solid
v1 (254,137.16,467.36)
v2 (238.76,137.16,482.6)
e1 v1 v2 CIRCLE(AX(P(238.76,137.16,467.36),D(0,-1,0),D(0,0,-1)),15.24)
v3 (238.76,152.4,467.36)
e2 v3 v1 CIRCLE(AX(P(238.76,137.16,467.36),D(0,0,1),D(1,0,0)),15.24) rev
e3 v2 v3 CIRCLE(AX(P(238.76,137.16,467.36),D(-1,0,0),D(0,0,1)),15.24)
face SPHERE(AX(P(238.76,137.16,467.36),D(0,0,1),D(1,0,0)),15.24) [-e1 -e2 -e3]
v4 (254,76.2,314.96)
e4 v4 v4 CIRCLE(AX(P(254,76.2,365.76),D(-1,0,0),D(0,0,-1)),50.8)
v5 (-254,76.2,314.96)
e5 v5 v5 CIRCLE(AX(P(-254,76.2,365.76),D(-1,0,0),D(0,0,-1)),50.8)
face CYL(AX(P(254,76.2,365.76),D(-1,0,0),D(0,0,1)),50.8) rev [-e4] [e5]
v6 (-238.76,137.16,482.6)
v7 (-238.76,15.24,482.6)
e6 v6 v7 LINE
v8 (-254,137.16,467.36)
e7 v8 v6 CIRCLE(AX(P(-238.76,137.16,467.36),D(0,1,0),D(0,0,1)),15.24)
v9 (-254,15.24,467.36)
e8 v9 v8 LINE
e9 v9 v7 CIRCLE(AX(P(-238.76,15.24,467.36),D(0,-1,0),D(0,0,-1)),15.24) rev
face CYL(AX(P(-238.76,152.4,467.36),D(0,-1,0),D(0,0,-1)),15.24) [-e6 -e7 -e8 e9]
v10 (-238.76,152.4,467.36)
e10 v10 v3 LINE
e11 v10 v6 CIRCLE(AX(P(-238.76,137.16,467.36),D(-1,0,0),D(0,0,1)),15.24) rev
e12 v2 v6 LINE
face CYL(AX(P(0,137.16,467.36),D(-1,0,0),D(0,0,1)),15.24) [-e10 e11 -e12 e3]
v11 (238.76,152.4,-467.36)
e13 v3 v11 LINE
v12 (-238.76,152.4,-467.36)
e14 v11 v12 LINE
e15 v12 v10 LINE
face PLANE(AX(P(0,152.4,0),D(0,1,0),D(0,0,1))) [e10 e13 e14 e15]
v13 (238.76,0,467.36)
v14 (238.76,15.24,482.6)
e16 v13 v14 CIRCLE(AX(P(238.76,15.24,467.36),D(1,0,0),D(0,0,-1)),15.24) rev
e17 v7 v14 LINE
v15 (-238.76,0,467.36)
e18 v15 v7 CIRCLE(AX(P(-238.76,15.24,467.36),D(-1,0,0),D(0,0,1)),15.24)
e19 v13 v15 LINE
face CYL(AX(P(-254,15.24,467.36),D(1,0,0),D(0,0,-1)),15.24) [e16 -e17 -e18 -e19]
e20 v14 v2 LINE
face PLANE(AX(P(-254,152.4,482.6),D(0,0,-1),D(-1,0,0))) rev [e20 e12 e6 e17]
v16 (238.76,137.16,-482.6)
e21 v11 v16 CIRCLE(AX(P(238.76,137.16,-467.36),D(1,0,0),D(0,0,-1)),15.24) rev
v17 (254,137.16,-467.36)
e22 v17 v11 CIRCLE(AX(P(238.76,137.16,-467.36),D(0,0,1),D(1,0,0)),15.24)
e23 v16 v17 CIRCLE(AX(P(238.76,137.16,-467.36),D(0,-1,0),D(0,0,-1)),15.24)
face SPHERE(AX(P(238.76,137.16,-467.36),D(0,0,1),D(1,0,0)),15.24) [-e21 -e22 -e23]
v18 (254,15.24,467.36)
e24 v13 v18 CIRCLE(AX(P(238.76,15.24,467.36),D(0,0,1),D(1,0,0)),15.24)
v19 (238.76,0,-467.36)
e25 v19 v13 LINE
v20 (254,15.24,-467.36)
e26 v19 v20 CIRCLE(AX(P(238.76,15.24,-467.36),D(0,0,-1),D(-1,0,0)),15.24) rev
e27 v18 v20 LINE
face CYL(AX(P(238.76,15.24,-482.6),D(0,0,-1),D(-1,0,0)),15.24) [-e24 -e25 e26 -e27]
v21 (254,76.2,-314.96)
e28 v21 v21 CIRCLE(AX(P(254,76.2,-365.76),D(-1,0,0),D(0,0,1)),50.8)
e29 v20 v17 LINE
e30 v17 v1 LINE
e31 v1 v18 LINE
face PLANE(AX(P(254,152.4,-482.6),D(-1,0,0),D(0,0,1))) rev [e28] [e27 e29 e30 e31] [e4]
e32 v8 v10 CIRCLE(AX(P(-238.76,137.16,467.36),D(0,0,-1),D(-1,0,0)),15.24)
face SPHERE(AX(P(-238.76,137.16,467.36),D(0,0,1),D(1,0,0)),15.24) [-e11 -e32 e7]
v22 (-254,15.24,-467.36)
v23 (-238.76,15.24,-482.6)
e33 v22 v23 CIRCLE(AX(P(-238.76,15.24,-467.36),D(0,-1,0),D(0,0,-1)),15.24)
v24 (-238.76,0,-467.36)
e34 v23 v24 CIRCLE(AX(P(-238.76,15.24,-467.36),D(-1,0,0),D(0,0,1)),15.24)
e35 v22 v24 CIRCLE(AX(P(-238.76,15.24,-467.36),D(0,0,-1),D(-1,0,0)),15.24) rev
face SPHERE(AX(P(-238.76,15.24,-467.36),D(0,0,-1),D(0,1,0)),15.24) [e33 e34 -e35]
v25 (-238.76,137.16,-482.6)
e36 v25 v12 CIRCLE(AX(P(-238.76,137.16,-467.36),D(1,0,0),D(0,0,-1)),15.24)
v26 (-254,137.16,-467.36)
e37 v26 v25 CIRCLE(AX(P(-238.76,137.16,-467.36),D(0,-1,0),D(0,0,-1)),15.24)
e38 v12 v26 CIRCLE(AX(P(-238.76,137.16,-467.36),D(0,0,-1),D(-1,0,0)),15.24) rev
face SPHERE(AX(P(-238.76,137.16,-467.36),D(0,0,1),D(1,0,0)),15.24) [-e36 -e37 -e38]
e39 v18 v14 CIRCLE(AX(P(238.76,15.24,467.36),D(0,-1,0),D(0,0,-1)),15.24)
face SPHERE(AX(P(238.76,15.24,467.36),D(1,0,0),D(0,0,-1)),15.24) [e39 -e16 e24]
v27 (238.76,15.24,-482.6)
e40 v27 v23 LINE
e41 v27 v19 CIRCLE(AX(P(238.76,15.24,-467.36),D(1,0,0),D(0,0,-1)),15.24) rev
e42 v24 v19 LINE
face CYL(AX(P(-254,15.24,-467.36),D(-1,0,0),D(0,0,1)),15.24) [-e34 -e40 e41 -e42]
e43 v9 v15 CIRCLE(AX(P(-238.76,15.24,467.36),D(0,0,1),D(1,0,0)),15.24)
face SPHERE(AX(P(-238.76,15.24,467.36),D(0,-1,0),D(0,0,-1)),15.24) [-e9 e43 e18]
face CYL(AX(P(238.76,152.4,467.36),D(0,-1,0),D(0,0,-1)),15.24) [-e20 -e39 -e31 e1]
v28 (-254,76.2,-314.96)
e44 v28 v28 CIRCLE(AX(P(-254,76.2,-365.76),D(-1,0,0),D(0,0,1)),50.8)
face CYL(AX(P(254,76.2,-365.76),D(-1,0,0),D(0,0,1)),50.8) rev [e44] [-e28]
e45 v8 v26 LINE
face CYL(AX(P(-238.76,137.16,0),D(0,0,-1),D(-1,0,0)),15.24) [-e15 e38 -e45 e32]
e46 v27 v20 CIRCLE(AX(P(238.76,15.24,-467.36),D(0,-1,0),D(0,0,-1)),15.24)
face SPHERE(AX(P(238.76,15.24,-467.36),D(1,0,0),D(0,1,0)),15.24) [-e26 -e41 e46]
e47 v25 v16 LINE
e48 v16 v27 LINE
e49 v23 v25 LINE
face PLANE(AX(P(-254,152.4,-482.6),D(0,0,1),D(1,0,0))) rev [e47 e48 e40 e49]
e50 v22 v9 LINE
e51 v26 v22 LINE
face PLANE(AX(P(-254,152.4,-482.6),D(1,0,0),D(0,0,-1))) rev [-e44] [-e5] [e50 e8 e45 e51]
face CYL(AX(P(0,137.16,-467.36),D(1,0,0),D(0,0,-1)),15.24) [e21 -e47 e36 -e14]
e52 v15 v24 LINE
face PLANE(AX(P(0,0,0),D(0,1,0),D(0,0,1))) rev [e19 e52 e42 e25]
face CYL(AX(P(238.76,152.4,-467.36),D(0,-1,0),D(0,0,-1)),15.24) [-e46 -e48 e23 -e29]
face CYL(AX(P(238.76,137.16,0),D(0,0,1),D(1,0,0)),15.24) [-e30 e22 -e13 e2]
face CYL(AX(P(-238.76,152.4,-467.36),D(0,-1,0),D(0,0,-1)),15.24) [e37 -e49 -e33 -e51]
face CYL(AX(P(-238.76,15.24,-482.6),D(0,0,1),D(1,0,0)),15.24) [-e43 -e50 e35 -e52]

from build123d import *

# Parameters (mm, degrees)
SKETCH2_W           = 508
SKETCH2_H           = 965.2
BOSS_EXTRUDE1_DEPTH = 152.4
FILLET1_R           = 15.24
FILLET2_R           = 15.24
SKETCH5_R           = 50.8
CUT_EXTRUDE1_DEPTH  = 718.072186045


with BuildPart() as part:
    # Sketch2 → Boss-Extrude1 (new body)
    with BuildSketch(Plane(origin=(0, 0, 0), x_dir=(1, 0, 0), z_dir=(0, 1, 0))):
        Rectangle(SKETCH2_W, SKETCH2_H)
    extrude(amount=BOSS_EXTRUDE1_DEPTH)

    # Fillet1
    fillet1_edges = [part.edges().sort_by_distance(p)[0] for p in [
        (-254, 152.4, 0),
        (0, 152.4, 482.6),
        (254, 152.4, 0),
        (0, 152.4, -482.6),
    ]]
    fillet(fillet1_edges, radius=FILLET1_R)

    # Fillet2
    # the kernel refuses this fillet: 15.24 mm, written as the material it takes off along each edge
    with BuildSketch(Plane(origin=(238.76, 137.16, -467.36), x_dir=(1, 0, 0), z_dir=(0, 0, -1))) as fillet2_piece_1_section:
        Polygon((0, 0), (FILLET2_R, 0), (FILLET2_R, -FILLET2_R), (0, -FILLET2_R), align=None)
    fillet2_piece_1 = extrude(amount=FILLET2_R, mode=Mode.PRIVATE)
    fillet2_piece_1 = fillet2_piece_1 - Plane(origin=(238.76, 137.16, -467.36), x_dir=(-0.7071067811865475, -0.7071067811865475, 0), z_dir=(0, 0, -1)) * Sphere(FILLET2_R, mode=Mode.PRIVATE)
    add(fillet2_piece_1, mode=Mode.SUBTRACT)
    with BuildSketch(Plane(origin=(238.76, 137.16, 467.36), x_dir=(0, 0, 1), z_dir=(1, 0, 0))) as fillet2_piece_2_section:
        Polygon((0, 0), (FILLET2_R, 0), (FILLET2_R, -FILLET2_R), (0, -FILLET2_R), align=None)
    fillet2_piece_2 = extrude(amount=FILLET2_R, mode=Mode.PRIVATE)
    fillet2_piece_2 = fillet2_piece_2 - Plane(origin=(238.76, 137.16, 467.36), x_dir=(0, -0.7071067811865475, -0.7071067811865475), z_dir=(1, 0, 0)) * Sphere(FILLET2_R, mode=Mode.PRIVATE)
    add(fillet2_piece_2, mode=Mode.SUBTRACT)
    with BuildSketch(Plane(origin=(-238.76, 137.16, -467.36), x_dir=(-1, 0, 0), z_dir=(0, 0, -1))) as fillet2_piece_3_section:
        Polygon((0, 0), (FILLET2_R, 0), (FILLET2_R, FILLET2_R), (0, FILLET2_R), align=None)
    fillet2_piece_3 = extrude(amount=FILLET2_R, mode=Mode.PRIVATE)
    fillet2_piece_3 = fillet2_piece_3 - Plane(origin=(-238.76, 137.16, -467.36), x_dir=(0.7071067811865475, -0.7071067811865475, 0), z_dir=(0, 0, -1)) * Sphere(FILLET2_R, mode=Mode.PRIVATE)
    add(fillet2_piece_3, mode=Mode.SUBTRACT)
    with BuildSketch(Plane(origin=(-238.76, 137.16, 467.36), x_dir=(0, 0, 1), z_dir=(-1, 0, 0))) as fillet2_piece_4_section:
        Polygon((0, 0), (FILLET2_R, 0), (FILLET2_R, FILLET2_R), (0, FILLET2_R), align=None)
    fillet2_piece_4 = extrude(amount=FILLET2_R, mode=Mode.PRIVATE)
    fillet2_piece_4 = fillet2_piece_4 - Plane(origin=(-238.76, 137.16, 467.36), x_dir=(0, -0.7071067811865475, -0.7071067811865475), z_dir=(-1, 0, 0)) * Sphere(FILLET2_R, mode=Mode.PRIVATE)
    add(fillet2_piece_4, mode=Mode.SUBTRACT)
    with BuildSketch(Plane(origin=(-238.76, 15.24, 467.36), x_dir=(0, -1, 0), z_dir=(-1, 0, 0))) as fillet2_piece_5_section:
        Polygon((0, 0), (FILLET2_R, 0), (FILLET2_R, FILLET2_R), (0, FILLET2_R), align=None)
    fillet2_piece_5 = extrude(amount=FILLET2_R, mode=Mode.PRIVATE)
    fillet2_piece_5 = fillet2_piece_5 - Plane(origin=(-238.76, 15.24, 467.36), x_dir=(0, 0.7071067811865475, -0.7071067811865475), z_dir=(-1, 0, 0)) * Sphere(FILLET2_R, mode=Mode.PRIVATE)
    add(fillet2_piece_5, mode=Mode.SUBTRACT)
    with BuildSketch(Plane(origin=(-238.76, 15.24, -467.36), x_dir=(-1, 0, 0), z_dir=(0, 0, -1))) as fillet2_piece_6_section:
        Polygon((0, 0), (FILLET2_R, 0), (FILLET2_R, -FILLET2_R), (0, -FILLET2_R), align=None)
    fillet2_piece_6 = extrude(amount=FILLET2_R, mode=Mode.PRIVATE)
    fillet2_piece_6 = fillet2_piece_6 - Plane(origin=(-238.76, 15.24, -467.36), x_dir=(0.7071067811865475, 0.7071067811865475, 0), z_dir=(0, 0, -1)) * Sphere(FILLET2_R, mode=Mode.PRIVATE)
    add(fillet2_piece_6, mode=Mode.SUBTRACT)
    with BuildSketch(Plane(origin=(238.76, 15.24, 467.36), x_dir=(1, 0, 0), z_dir=(0, -1, 0))) as fillet2_piece_7_section:
        Polygon((0, 0), (FILLET2_R, 0), (FILLET2_R, FILLET2_R), (0, FILLET2_R), align=None)
    fillet2_piece_7 = extrude(amount=FILLET2_R, mode=Mode.PRIVATE)
    fillet2_piece_7 = fillet2_piece_7 - Plane(origin=(238.76, 15.24, 467.36), x_dir=(-0.7071067811865477, 0, -0.7071067811865474), z_dir=(0, -1, 0)) * Sphere(FILLET2_R, mode=Mode.PRIVATE)
    add(fillet2_piece_7, mode=Mode.SUBTRACT)
    with BuildSketch(Plane(origin=(238.76, 15.24, -467.36), x_dir=(0, -1, 0), z_dir=(0, 0, -1))) as fillet2_piece_8_section:
        Polygon((0, 0), (FILLET2_R, 0), (FILLET2_R, -FILLET2_R), (0, -FILLET2_R), align=None)
    fillet2_piece_8 = extrude(amount=FILLET2_R, mode=Mode.PRIVATE)
    fillet2_piece_8 = fillet2_piece_8 - Plane(origin=(238.76, 15.24, -467.36), x_dir=(-0.7071067811865475, 0.7071067811865475, 0), z_dir=(0, 0, -1)) * Sphere(FILLET2_R, mode=Mode.PRIVATE)
    add(fillet2_piece_8, mode=Mode.SUBTRACT)
    with BuildSketch(Plane(origin=(-254, 15.24, 482.6), x_dir=(0, 0, -1), z_dir=(0, 1, 0)), Plane(origin=(-254, 15.24, -482.6), x_dir=(1, 0, 0), z_dir=(0, 1, 0))) as fillet2_piece_9:
        with BuildLine():
            CenterArc((FILLET2_R, -FILLET2_R), FILLET2_R, 90, 90)
            Line((0, -FILLET2_R), (0, 0))
            Line((0, 0), (FILLET2_R, 0))
        make_face()
    extrude(amount=121.92, mode=Mode.SUBTRACT)
    with BuildSketch(Plane(origin=(254, 15.24, 482.6), x_dir=(0, 0, -1), z_dir=(0, 1, 0)), Plane(origin=(254, 15.24, -482.6), x_dir=(-1, 0, 0), z_dir=(0, 1, 0))) as fillet2_piece_10:
        with BuildLine():
            CenterArc((FILLET2_R, FILLET2_R), FILLET2_R, 180, 90)
            Line((0, FILLET2_R), (0, 0))
            Line((0, 0), (FILLET2_R, 0))
        make_face()
    extrude(amount=121.92, mode=Mode.SUBTRACT)
    with BuildSketch(Plane(origin=(238.76, 0, 482.6), x_dir=(0, 0, -1), z_dir=(-1, 0, 0))) as fillet2_piece_11:
        with BuildLine():
            CenterArc((FILLET2_R, -FILLET2_R), FILLET2_R, 90, 90)
            Line((0, -FILLET2_R), (0, 0))
            Line((0, 0), (FILLET2_R, 0))
        make_face()
    extrude(amount=477.52, mode=Mode.SUBTRACT)
    with BuildSketch(Plane(origin=(-254, 0, 467.36), x_dir=(0, 1, 0), z_dir=(0, 0, -1))) as fillet2_piece_12:
        with BuildLine():
            CenterArc((FILLET2_R, FILLET2_R), FILLET2_R, 180, 90)
            Line((0, FILLET2_R), (0, 0))
            Line((0, 0), (FILLET2_R, 0))
        make_face()
    extrude(amount=934.72, mode=Mode.SUBTRACT)
    with BuildSketch(Plane(origin=(-238.76, 0, -482.6), x_dir=(0, 1, 0), z_dir=(1, 0, 0))) as fillet2_piece_13:
        with BuildLine():
            CenterArc((FILLET2_R, FILLET2_R), FILLET2_R, 180, 90)
            Line((0, FILLET2_R), (0, 0))
            Line((0, 0), (FILLET2_R, 0))
        make_face()
    extrude(amount=477.52, mode=Mode.SUBTRACT)
    with BuildSketch(Plane(origin=(254, 0, -467.36), x_dir=(-1, 0, 0), z_dir=(0, 0, 1))) as fillet2_piece_14:
        with BuildLine():
            CenterArc((FILLET2_R, -FILLET2_R), FILLET2_R, 90, 90)
            Line((0, -FILLET2_R), (0, 0))
            Line((0, 0), (FILLET2_R, 0))
        make_face()
    extrude(amount=934.72, mode=Mode.SUBTRACT)

    # Sketch5 → Cut-Extrude1 (cut, through all)
    with BuildSketch(Plane.ZY.offset(254)):
        with Locations((-365.76, 76.2)):
            Circle(SKETCH5_R)
        with Locations(Location((365.76, 76.2, 0), (0, 0, 180))):
            Circle(SKETCH5_R)
    extrude(amount=-CUT_EXTRUDE1_DEPTH, mode=Mode.SUBTRACT)


solid = part.part
